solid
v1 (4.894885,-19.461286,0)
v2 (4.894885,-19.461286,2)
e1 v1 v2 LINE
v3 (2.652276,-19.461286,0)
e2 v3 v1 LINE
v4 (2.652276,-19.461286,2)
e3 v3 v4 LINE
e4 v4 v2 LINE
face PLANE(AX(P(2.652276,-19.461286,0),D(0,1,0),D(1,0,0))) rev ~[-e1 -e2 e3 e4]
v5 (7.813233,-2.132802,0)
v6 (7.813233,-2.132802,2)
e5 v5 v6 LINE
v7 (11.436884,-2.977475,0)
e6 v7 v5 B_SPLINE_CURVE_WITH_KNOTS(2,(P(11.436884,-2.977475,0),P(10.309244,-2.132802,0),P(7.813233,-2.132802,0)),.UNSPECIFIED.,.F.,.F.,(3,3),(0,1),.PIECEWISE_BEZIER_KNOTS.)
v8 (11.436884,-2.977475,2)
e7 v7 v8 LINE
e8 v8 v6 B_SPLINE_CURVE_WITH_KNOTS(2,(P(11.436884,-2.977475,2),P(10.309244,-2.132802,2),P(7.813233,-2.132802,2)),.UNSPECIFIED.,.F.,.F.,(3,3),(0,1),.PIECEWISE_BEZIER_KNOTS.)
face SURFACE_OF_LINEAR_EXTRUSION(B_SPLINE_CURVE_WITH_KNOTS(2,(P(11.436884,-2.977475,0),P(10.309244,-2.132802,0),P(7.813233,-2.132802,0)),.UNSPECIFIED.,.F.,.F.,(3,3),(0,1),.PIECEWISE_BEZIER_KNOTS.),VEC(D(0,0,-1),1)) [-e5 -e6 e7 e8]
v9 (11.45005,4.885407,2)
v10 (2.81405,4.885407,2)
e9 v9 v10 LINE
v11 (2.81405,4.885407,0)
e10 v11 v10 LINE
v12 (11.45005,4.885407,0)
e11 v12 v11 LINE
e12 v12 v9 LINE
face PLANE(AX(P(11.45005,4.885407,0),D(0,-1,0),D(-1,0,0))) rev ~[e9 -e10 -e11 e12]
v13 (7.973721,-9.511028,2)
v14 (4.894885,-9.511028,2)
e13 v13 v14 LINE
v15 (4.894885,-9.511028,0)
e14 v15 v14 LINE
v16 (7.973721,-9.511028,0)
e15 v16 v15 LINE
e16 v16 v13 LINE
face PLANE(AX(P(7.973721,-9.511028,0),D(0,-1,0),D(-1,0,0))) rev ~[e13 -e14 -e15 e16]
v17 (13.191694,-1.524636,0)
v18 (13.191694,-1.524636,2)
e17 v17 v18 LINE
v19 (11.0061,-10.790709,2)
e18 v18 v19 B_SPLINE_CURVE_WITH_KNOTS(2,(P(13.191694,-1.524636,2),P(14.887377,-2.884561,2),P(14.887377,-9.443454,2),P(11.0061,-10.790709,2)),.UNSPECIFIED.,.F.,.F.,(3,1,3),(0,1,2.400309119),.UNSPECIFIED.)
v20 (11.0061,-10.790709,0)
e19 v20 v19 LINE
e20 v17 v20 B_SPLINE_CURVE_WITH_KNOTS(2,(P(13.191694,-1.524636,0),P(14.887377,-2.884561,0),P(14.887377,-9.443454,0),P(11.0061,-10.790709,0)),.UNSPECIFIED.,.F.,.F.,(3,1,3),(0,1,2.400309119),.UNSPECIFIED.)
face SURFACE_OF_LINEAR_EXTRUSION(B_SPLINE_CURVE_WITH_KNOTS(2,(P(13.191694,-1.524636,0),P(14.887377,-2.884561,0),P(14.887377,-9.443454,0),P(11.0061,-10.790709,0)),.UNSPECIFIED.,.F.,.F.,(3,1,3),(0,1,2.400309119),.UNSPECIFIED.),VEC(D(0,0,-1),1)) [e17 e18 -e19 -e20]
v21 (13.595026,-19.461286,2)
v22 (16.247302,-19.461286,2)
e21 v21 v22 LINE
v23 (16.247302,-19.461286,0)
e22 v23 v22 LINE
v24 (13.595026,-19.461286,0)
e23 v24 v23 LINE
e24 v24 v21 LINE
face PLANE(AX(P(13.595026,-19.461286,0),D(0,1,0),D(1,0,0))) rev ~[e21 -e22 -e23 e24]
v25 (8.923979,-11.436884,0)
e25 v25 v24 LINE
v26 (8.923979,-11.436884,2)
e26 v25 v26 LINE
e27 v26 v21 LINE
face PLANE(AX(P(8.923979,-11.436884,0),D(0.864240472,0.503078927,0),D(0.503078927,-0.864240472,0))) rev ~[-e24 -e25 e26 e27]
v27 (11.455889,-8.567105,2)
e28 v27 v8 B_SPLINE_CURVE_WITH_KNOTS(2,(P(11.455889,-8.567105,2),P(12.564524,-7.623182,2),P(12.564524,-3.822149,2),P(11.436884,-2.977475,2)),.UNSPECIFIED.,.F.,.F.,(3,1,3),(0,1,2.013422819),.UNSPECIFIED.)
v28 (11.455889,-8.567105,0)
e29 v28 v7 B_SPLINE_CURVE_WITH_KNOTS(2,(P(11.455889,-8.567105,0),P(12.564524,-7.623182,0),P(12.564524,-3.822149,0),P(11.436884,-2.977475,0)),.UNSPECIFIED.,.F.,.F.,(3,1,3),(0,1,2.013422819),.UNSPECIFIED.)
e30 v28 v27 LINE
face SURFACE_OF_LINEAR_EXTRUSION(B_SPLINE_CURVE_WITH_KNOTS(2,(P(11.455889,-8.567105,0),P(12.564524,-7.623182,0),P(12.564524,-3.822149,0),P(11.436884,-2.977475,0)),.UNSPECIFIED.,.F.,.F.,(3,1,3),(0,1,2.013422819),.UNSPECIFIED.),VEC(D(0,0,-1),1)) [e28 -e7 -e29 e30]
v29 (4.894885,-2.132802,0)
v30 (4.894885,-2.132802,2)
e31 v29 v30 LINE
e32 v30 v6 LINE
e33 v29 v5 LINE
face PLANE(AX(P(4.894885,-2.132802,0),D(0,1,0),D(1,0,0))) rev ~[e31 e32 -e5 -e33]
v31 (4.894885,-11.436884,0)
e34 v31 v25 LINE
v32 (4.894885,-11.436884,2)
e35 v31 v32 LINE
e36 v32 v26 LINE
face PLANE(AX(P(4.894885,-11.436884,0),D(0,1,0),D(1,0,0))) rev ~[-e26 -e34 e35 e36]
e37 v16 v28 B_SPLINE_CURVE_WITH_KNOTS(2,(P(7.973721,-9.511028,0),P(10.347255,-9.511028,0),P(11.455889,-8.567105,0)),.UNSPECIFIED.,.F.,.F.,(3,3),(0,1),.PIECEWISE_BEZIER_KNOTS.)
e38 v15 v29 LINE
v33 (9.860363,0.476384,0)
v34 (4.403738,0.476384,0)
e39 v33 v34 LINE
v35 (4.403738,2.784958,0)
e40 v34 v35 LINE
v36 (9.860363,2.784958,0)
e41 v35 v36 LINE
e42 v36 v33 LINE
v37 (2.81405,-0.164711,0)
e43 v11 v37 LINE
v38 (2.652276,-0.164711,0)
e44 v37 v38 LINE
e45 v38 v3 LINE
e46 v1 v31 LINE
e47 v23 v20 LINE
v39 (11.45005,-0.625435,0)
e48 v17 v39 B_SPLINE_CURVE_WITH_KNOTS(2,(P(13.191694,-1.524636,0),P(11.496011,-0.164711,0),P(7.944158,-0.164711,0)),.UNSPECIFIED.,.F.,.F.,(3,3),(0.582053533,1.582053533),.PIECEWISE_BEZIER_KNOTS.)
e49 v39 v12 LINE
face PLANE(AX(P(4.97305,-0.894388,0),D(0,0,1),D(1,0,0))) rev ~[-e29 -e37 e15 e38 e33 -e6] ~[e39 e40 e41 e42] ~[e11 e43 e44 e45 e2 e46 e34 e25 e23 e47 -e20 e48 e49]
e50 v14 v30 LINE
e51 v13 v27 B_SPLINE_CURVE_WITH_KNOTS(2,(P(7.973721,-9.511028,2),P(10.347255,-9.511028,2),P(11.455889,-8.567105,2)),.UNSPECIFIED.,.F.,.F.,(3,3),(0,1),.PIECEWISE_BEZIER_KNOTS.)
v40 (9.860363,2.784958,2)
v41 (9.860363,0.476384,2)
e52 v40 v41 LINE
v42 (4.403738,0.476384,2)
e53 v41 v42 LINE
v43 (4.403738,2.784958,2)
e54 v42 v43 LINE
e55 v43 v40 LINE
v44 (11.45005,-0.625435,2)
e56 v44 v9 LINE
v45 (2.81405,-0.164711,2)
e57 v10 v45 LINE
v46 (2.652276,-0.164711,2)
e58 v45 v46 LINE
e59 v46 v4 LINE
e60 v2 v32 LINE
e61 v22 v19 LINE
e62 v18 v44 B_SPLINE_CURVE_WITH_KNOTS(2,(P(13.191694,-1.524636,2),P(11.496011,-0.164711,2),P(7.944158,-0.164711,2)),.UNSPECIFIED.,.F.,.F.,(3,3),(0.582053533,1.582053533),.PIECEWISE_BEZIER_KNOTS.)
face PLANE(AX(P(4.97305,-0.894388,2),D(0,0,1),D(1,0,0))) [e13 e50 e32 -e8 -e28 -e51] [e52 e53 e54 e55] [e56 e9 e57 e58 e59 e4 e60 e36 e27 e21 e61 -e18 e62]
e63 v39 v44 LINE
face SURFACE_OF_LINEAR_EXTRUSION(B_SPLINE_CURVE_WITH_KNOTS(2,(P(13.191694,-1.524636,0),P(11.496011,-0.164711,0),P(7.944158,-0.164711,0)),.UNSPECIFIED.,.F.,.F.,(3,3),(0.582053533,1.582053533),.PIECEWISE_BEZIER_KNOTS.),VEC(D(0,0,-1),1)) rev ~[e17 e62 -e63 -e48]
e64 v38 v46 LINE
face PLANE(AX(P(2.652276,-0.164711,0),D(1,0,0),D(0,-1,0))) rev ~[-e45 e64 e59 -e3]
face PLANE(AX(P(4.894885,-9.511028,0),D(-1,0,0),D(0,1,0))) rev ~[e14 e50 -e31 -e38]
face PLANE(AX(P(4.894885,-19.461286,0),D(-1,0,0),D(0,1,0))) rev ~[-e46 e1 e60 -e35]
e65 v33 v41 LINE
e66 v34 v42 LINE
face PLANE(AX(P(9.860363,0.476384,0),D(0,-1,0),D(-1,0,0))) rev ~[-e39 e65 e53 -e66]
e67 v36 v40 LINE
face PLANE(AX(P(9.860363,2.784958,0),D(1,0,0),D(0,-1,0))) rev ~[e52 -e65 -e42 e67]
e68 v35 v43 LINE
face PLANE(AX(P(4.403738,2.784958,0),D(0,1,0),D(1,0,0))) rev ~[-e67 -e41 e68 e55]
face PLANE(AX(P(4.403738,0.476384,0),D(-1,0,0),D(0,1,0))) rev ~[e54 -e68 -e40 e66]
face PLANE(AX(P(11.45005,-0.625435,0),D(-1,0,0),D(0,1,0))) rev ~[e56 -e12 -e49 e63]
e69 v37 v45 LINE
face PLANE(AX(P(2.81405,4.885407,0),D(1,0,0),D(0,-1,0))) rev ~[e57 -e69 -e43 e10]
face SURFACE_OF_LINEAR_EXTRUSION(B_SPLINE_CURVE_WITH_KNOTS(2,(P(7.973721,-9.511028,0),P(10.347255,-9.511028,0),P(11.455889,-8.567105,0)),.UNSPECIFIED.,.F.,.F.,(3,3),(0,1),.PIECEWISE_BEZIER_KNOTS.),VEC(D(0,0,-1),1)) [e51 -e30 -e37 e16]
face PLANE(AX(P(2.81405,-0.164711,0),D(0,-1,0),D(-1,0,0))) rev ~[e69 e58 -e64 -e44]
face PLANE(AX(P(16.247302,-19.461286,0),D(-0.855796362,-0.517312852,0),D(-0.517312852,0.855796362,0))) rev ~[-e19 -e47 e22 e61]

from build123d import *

# Parameters (mm, degrees)
F0_W     = 4.318
F0_H     = 1.4593527386
F1_DEPTH = 2


with BuildPart() as f1:
    # F0 (on Top) → F1 (new body)
    with BuildSketch(Plane.XY):
        with Locations((4.9730502656, -0.8943877724)):
            Rectangle(F0_W, F0_H)
        with BuildLine():
            Line((7.1320502656, -1.6240641417), (2.8140502656, -1.6240641417))
            Line((2.8140502656, -1.6240641417), (2.8140502656, -0.1647114031))
            Line((2.8140502656, -0.1647114031), (2.6522759268, -0.1647114031))
            Line((2.6522759268, -0.1647114031), (2.6522759268, -19.4612857813))
            Line((2.6522759268, -19.4612857813), (4.8948850305, -19.4612857813))
            Line((4.8948850305, -19.4612857813), (4.8948850305, -11.436884092))
            Line((4.8948850305, -11.436884092), (8.9239793524, -11.436884092))
            Line((8.9239793524, -11.436884092), (13.5950258095, -19.4612857813))
            Line((13.5950258095, -19.4612857813), (16.2473017363, -19.4612857813))
            Line((16.2473017363, -19.4612857813), (11.0061004223, -10.7907085875))
            add(Edge.make_bspline(
                [(14.8873768184, -5.6170811825), (14.8873768184, -9.4434537776), (11.0061004223, -10.7907085875)],
                knots=[0, 0, 0, 1, 1, 1], degree=2))
            add(Edge.make_bspline(
                [(13.1916940404, -1.524636321), (14.8873768184, -2.8845612389), (14.8873768184, -5.6170811825)],
                knots=[0, 0, 0, 1, 1, 1], degree=2))
            add(Edge.make_bspline(
                [(11.4500502656, -0.6254353556), (12.4829894147, -0.9562605066), (13.1916940404, -1.524636321)],
                knots=[0.5820535333, 0.5820535333, 0.5820535333, 1, 1, 1], degree=2))
            Line((11.4500502656, -0.6254353556), (11.4500502656, -1.6240641417))
            Line((11.4500502656, -1.6240641417), (7.1320502656, -1.6240641417))
        make_face()
        with BuildLine():
            Line((7.9737212576, -9.5110276865), (4.8948850305, -9.5110276865))
            Line((4.8948850305, -9.5110276865), (4.8948850305, -2.1328015016))
            Line((4.8948850305, -2.1328015016), (7.8132332238, -2.1328015016))
            add(Edge.make_bspline(
                [(11.436884092, -2.9774753637), (10.3092444862, -2.1328015016), (7.8132332238, -2.1328015016)],
                knots=[0, 0, 0, 1, 1, 1], degree=2))
            add(Edge.make_bspline(
                [(12.5645236978, -5.7353355232), (12.5645236978, -3.8221492257), (11.436884092, -2.9774753637)],
                knots=[0, 0, 0, 1, 1, 1], degree=2))
            add(Edge.make_bspline(
                [(11.4558892539, -8.5671046457), (12.5645236978, -7.6231816049), (12.5645236978, -5.7353355232)],
                knots=[0, 0, 0, 1, 1, 1], degree=2))
            add(Edge.make_bspline(
                [(7.9737212576, -9.5110276865), (10.3472548099, -9.5110276865), (11.4558892539, -8.5671046457)],
                knots=[0, 0, 0, 1, 1, 1], degree=2))
        make_face(mode=Mode.SUBTRACT)
        with BuildLine():
            Line((7.1320502656, -0.1647114031), (7.1320502656, -1.6240641417))
            Line((7.1320502656, -1.6240641417), (11.4500502656, -1.6240641417))
            Line((11.4500502656, -1.6240641417), (11.4500502656, -0.6254353556))
            add(Edge.make_bspline(
                [(7.9441576725, -0.1647114031), (10.0115266043, -0.1647114031), (11.4500502656, -0.6254353556)],
                knots=[0, 0, 0, 0.5820535333, 0.5820535333, 0.5820535333], degree=2))
            Line((7.9441576725, -0.1647114031), (7.1320502656, -0.1647114031))
        make_face()
        Polygon((2.8140502656, 4.8854069319), (2.8140502656, -0.1647114031), (7.1320502656, -0.1647114031), (7.1320502656, 0.4763843317), (4.4037376737, 0.4763843317), (4.4037376737, 2.7849584585), (7.1320502656, 2.7849584585), (7.1320502656, 4.8854069319), align=None)
        with BuildLine():
            Line((7.1320502656, 0.4763843317), (7.1320502656, -0.1647114031))
            Line((7.1320502656, -0.1647114031), (7.9441576725, -0.1647114031))
            add(Edge.make_bspline(
                [(7.9441576725, -0.1647114031), (10.0115266043, -0.1647114031), (11.4500502656, -0.6254353556)],
                knots=[0, 0, 0, 0.5820535333, 0.5820535333, 0.5820535333], degree=2))
            Line((11.4500502656, -0.6254353556), (11.4500502656, 4.8854069319))
            Line((11.4500502656, 4.8854069319), (7.1320502656, 4.8854069319))
            Line((7.1320502656, 4.8854069319), (7.1320502656, 2.7849584585))
            Line((7.1320502656, 2.7849584585), (9.8603628576, 2.7849584585))
            Line((9.8603628576, 2.7849584585), (9.8603628576, 0.4763843317))
            Line((9.8603628576, 0.4763843317), (7.1320502656, 0.4763843317))
        make_face()
    extrude(amount=F1_DEPTH)


solid = f1.part
